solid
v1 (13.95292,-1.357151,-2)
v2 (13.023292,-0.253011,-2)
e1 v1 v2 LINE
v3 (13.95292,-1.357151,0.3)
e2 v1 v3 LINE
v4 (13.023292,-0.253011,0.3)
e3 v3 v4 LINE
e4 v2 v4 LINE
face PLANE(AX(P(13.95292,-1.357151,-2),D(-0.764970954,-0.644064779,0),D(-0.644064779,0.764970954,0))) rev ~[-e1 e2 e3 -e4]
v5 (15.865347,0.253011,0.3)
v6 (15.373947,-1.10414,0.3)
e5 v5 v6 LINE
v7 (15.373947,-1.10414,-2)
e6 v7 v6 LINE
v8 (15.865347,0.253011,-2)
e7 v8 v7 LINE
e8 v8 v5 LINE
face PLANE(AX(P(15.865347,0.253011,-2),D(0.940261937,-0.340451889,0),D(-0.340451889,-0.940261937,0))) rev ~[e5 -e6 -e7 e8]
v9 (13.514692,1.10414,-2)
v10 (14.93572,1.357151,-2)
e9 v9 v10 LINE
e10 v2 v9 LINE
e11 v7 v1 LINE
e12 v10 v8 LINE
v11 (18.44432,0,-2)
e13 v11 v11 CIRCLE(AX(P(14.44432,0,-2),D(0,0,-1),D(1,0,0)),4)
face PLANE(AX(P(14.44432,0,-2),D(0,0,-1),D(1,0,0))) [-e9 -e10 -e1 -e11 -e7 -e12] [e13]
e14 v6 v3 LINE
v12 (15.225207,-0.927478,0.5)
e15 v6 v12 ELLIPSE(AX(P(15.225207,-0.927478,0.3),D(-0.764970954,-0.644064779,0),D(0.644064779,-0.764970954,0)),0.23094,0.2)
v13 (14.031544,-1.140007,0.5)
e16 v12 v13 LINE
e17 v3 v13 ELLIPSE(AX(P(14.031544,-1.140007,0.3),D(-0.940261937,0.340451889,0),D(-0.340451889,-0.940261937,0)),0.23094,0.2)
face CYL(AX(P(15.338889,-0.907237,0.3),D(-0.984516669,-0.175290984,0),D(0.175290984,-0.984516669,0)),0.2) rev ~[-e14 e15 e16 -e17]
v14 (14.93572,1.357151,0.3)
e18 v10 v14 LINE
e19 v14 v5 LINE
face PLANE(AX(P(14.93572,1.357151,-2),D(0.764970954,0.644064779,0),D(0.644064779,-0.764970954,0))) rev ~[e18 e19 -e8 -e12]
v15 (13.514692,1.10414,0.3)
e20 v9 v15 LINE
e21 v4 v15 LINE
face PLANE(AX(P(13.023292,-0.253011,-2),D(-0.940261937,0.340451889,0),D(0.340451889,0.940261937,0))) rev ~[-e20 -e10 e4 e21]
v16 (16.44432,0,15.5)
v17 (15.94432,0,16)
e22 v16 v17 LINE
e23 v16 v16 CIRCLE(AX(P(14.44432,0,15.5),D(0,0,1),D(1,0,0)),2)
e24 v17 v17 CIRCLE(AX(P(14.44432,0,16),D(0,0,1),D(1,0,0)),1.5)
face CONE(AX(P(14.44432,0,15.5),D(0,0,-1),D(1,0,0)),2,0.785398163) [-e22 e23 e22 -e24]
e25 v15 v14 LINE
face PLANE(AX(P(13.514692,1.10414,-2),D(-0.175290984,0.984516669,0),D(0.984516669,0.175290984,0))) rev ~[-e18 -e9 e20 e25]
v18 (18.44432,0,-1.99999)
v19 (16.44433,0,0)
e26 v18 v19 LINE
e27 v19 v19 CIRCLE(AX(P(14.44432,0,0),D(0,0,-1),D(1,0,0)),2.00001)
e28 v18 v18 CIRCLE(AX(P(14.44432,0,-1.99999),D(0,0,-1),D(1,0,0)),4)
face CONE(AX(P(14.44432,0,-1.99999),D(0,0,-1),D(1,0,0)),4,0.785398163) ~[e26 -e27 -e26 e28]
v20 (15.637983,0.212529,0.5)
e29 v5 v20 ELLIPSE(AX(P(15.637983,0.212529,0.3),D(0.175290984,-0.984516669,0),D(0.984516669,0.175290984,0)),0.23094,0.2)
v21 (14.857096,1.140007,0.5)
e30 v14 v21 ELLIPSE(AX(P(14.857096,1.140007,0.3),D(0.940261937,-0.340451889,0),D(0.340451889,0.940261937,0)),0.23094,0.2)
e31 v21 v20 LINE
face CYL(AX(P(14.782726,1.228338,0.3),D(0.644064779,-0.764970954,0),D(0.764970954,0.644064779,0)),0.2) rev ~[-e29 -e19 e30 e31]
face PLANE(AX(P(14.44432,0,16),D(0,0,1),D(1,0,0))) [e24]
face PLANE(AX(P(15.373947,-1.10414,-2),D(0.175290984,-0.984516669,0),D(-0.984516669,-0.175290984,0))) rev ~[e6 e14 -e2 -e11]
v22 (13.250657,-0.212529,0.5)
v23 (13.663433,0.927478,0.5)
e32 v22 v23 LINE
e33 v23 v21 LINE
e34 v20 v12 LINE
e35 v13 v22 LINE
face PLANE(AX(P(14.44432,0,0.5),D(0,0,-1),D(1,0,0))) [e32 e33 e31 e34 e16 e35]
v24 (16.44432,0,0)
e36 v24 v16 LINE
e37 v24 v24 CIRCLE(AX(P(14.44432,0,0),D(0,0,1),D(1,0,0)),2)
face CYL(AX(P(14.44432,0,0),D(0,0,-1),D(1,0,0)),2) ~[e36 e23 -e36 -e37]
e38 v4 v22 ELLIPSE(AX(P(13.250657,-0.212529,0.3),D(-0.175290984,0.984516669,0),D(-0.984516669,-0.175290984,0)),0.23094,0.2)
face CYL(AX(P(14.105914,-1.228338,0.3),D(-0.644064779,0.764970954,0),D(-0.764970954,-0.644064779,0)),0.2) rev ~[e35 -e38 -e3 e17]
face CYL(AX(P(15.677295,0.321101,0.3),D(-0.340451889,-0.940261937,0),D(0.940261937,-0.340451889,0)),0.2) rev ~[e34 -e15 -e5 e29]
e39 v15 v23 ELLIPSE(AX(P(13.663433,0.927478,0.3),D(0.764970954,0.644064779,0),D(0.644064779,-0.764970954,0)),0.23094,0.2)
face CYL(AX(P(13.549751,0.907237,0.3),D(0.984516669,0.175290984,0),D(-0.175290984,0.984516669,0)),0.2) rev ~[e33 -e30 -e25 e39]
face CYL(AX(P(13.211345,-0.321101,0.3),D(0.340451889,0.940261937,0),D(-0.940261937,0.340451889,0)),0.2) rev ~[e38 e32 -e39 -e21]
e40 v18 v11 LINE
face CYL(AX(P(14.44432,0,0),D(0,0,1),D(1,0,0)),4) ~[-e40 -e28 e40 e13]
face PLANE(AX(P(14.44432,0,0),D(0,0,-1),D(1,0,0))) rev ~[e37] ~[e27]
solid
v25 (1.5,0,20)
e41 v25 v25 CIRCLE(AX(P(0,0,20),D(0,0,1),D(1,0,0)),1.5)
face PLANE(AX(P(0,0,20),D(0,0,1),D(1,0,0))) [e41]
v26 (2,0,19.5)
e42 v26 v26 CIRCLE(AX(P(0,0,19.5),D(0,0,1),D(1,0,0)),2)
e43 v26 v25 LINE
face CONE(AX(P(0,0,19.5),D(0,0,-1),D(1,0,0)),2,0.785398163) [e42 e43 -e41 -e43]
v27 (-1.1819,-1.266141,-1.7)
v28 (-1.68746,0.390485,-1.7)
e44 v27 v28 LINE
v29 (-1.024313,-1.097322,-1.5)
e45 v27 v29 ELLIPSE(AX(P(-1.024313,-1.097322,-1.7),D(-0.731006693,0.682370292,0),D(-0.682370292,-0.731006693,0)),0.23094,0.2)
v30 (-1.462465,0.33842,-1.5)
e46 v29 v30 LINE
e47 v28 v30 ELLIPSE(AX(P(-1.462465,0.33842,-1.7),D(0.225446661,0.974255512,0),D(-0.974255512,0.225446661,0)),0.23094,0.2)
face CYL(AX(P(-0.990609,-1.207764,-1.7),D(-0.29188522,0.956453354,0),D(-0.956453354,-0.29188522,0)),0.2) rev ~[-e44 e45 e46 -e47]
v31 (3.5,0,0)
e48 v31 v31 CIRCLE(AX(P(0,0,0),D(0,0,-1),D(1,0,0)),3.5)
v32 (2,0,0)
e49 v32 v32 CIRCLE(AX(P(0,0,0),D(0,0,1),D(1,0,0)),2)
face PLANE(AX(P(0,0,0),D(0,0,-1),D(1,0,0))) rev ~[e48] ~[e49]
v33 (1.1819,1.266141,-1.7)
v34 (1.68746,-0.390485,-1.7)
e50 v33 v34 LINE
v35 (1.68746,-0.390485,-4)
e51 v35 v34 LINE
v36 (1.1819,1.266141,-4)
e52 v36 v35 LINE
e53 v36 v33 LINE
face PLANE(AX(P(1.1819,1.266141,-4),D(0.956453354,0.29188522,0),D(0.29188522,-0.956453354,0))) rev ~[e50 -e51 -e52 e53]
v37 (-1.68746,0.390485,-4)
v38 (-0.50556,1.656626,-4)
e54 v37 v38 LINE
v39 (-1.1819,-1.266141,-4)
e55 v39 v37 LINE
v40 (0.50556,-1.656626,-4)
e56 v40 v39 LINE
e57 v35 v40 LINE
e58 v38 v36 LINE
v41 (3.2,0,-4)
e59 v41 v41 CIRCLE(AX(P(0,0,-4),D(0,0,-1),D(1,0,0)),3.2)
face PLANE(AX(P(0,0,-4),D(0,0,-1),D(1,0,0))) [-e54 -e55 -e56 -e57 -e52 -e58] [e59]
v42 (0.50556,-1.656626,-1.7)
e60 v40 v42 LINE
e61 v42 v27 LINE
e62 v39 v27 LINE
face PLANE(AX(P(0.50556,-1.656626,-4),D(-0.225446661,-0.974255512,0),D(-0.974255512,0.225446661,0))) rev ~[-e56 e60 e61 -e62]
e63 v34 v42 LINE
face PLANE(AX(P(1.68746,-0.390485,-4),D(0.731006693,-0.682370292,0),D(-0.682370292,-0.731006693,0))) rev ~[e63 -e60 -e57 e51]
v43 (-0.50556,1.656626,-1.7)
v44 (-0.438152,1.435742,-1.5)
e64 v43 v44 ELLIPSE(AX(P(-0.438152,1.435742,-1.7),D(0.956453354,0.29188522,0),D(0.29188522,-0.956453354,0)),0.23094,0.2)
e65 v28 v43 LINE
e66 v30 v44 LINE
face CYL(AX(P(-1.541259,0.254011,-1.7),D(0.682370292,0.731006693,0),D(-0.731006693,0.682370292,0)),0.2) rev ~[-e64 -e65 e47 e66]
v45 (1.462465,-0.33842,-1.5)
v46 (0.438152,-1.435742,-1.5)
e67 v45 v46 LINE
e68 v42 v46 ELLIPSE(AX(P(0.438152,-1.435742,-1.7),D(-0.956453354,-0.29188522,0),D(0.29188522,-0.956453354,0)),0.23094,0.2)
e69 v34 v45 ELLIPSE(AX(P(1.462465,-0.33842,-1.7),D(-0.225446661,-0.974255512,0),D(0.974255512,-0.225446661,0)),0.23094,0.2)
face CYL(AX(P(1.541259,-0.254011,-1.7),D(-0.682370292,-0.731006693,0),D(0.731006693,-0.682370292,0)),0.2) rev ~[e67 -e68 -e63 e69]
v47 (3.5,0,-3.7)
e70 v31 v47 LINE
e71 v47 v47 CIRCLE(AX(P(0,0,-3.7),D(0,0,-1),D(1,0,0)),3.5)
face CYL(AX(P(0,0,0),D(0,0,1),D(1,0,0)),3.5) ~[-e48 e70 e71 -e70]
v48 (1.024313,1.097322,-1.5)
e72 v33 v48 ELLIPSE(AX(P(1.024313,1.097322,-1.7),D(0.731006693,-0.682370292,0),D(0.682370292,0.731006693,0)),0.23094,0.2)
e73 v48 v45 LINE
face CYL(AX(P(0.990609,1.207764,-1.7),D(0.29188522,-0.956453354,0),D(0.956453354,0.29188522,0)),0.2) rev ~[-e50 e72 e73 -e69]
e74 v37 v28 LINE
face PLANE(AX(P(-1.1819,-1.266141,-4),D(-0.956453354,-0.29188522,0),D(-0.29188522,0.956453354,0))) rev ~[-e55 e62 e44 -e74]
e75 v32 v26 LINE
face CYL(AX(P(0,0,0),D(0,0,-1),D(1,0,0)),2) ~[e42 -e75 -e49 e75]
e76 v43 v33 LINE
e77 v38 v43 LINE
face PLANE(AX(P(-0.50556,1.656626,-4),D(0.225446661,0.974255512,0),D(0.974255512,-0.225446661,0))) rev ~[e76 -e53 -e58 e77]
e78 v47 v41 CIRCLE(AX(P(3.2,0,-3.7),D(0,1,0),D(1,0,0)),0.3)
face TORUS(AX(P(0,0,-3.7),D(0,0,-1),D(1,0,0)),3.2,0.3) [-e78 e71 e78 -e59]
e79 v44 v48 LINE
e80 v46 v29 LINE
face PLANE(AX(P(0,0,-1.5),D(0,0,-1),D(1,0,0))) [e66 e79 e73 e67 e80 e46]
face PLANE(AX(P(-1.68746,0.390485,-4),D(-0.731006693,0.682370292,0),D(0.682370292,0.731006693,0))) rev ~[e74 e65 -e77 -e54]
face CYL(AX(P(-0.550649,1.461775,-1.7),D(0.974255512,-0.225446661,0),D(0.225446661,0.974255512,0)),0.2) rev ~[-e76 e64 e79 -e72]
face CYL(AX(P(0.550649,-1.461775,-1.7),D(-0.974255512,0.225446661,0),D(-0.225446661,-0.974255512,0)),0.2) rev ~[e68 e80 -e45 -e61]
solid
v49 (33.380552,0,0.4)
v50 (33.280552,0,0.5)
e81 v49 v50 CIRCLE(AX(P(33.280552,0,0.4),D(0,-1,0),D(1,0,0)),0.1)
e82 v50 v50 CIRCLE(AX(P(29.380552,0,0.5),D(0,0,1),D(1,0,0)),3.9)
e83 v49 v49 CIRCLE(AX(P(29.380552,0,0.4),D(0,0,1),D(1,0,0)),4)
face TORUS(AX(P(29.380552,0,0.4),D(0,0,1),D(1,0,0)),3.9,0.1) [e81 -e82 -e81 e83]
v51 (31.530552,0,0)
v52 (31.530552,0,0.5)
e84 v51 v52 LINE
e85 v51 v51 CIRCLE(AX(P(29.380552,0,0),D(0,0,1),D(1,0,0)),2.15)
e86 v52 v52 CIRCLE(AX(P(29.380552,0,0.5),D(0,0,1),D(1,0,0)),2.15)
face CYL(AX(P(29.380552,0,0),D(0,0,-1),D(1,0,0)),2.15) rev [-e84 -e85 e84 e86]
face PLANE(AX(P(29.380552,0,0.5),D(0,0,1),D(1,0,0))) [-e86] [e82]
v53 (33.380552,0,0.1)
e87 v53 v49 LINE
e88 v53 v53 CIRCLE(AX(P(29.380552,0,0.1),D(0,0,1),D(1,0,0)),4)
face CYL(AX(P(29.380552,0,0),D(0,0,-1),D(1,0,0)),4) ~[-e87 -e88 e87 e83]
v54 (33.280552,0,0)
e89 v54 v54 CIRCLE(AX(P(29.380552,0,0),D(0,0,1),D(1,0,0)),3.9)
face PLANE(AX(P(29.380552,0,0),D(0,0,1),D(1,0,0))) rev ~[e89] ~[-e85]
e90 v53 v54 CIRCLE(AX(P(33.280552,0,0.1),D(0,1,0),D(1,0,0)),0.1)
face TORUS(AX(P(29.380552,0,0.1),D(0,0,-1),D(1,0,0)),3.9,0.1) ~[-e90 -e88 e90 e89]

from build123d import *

# Parameters (mm, degrees)
F0_R      = 2
F1_DEPTH  = 20
F2_SIZE   = 0.5
F3_R      = 3.5
F4_DEPTH  = 4
F5_R      = 0.3
F7_DEPTH  = 2.5
F8_R      = 0.2
F9_R      = 2
F10_DEPTH = 16
F11_SIZE  = 0.5
F12_R     = 4
F13_DEPTH = 2
F15_DEPTH = 2.5
F16_R     = 0.2
F17_SIZE  = 1.99999
F18_R     = 4
F18_R_2   = 2.15
F19_DEPTH = 0.5
F20_R     = 0.1


# Not quite as in the source:
# - a fillet or chamfer is up to 0.001 mm smaller than in the source, because OpenCascade refuses the exact size


with BuildPart() as f1:
    # F0 (on Top) → F1 (new body)
    with BuildSketch(Plane.XY):
        Circle(F0_R)
    extrude(amount=F1_DEPTH)

    # F2
    f2_edges = [f1.edges().sort_by_distance(p)[0] for p in [
        (-2, 0, 20),
    ]]
    chamfer(f2_edges, length=F2_SIZE)

    # F3 (on face) → F4 (join)
    with BuildSketch(Plane(origin=(0, 0, 0), x_dir=(1, 0, 0), z_dir=(0, 0, -1))):
        Circle(F3_R)
    extrude(amount=F4_DEPTH)

    # F5
    f5_edges = [f1.edges().sort_by_distance(p)[0] for p in [
        (-3.5, 0, -4),
    ]]
    fillet(f5_edges, radius=F5_R)

    # F6 (on face) → F7 (cut)
    with BuildSketch(Plane(origin=(0, 0, -4), x_dir=(1, 0, 0), z_dir=(0, 0, -1))):
        Polygon((1.6874600466, 0.3904850718), (0.5055600313, 1.6566258041), (-1.1819000152, 1.2661407323), (-1.6874600466, -0.3904850718), (-0.5055600313, -1.6566258041), (1.1819000152, -1.2661407323), align=None)
    extrude(amount=-F7_DEPTH, mode=Mode.SUBTRACT)

    # F8
    f8_edges = [f1.edges().sort_by_distance(p)[0] for p in [
        (0.33817, 1.461383, -1.5),
        (1.43468, 0.437828, -1.5),
        (1.09651, -1.023555, -1.5),
        (-0.33817, -1.461383, -1.5),
        (-1.43468, -0.437828, -1.5),
        (-1.09651, 1.023555, -1.5),
    ]]
    fillet(f8_edges, radius=F8_R)


with BuildPart() as f10:
    # F9 (on Top) → F10 (new body)
    with BuildSketch(Plane.XY):
        with Locations((14.4443198481, 0)):
            Circle(F9_R)
    extrude(amount=F10_DEPTH)

    # F11
    f11_edges = [f10.edges().sort_by_distance(p)[0] for p in [
        (12.44432, 0, 16),
    ]]
    chamfer(f11_edges, length=F11_SIZE)

    # F12 (on face) → F13 (join)
    with BuildSketch(Plane(origin=(0, 0, 0), x_dir=(1, 0, 0), z_dir=(0, 0, -1))):
        with Locations((14.4443198481, 0)):
            Circle(F12_R)
    extrude(amount=F13_DEPTH)

    # F14 (on face) → F15 (cut)
    with BuildSketch(Plane(origin=(0, 0, -2), x_dir=(1, 0, 0), z_dir=(0, 0, -1))):
        Polygon((14.9357198231, -1.3571512067), (15.8653472574, -0.2530107417), (15.3739472825, 1.1041404651), (13.9529198732, 1.3571512067), (13.0232924389, 0.2530107417), (13.5146924138, -1.1041404651), align=None)
    extrude(amount=-F15_DEPTH, mode=Mode.SUBTRACT)

    # F16
    f16_edges = [f10.edges().sort_by_distance(p)[0] for p in [
        (14.225206, 1.230646, 0.5),
        (15.400534, 0.805081, 0.5),
        (15.619647, -0.425565, 0.5),
        (14.663434, -1.230646, 0.5),
        (13.488106, -0.805081, 0.5),
        (13.268992, 0.425565, 0.5),
    ]]
    fillet(f16_edges, radius=F16_R)

    # F17 (size 2 in the source; OpenCascade refuses exactly that, so slightly less here)
    f17_edges = [f10.edges().sort_by_distance(p)[0] for p in [
        (10.44432, 0, 0),
    ]]
    chamfer(f17_edges, length=F17_SIZE)


with BuildPart() as f19:
    # F18 (on Top) → F19 (new body)
    with BuildSketch(Plane.XY):
        with Locations((29.3805521813, 0)):
            Circle(F18_R)
        with Locations((29.3805521813, 0)):
            Circle(F18_R_2, mode=Mode.SUBTRACT)
    extrude(amount=F19_DEPTH)

    # F20
    f20_edges = [f19.edges().sort_by_distance(p)[0] for p in [
        (25.380552, 0, 0),
        (25.380552, 0, 0.5),
    ]]
    fillet(f20_edges, radius=F20_R)


solid = Compound([f1.part, f10.part, f19.part])
